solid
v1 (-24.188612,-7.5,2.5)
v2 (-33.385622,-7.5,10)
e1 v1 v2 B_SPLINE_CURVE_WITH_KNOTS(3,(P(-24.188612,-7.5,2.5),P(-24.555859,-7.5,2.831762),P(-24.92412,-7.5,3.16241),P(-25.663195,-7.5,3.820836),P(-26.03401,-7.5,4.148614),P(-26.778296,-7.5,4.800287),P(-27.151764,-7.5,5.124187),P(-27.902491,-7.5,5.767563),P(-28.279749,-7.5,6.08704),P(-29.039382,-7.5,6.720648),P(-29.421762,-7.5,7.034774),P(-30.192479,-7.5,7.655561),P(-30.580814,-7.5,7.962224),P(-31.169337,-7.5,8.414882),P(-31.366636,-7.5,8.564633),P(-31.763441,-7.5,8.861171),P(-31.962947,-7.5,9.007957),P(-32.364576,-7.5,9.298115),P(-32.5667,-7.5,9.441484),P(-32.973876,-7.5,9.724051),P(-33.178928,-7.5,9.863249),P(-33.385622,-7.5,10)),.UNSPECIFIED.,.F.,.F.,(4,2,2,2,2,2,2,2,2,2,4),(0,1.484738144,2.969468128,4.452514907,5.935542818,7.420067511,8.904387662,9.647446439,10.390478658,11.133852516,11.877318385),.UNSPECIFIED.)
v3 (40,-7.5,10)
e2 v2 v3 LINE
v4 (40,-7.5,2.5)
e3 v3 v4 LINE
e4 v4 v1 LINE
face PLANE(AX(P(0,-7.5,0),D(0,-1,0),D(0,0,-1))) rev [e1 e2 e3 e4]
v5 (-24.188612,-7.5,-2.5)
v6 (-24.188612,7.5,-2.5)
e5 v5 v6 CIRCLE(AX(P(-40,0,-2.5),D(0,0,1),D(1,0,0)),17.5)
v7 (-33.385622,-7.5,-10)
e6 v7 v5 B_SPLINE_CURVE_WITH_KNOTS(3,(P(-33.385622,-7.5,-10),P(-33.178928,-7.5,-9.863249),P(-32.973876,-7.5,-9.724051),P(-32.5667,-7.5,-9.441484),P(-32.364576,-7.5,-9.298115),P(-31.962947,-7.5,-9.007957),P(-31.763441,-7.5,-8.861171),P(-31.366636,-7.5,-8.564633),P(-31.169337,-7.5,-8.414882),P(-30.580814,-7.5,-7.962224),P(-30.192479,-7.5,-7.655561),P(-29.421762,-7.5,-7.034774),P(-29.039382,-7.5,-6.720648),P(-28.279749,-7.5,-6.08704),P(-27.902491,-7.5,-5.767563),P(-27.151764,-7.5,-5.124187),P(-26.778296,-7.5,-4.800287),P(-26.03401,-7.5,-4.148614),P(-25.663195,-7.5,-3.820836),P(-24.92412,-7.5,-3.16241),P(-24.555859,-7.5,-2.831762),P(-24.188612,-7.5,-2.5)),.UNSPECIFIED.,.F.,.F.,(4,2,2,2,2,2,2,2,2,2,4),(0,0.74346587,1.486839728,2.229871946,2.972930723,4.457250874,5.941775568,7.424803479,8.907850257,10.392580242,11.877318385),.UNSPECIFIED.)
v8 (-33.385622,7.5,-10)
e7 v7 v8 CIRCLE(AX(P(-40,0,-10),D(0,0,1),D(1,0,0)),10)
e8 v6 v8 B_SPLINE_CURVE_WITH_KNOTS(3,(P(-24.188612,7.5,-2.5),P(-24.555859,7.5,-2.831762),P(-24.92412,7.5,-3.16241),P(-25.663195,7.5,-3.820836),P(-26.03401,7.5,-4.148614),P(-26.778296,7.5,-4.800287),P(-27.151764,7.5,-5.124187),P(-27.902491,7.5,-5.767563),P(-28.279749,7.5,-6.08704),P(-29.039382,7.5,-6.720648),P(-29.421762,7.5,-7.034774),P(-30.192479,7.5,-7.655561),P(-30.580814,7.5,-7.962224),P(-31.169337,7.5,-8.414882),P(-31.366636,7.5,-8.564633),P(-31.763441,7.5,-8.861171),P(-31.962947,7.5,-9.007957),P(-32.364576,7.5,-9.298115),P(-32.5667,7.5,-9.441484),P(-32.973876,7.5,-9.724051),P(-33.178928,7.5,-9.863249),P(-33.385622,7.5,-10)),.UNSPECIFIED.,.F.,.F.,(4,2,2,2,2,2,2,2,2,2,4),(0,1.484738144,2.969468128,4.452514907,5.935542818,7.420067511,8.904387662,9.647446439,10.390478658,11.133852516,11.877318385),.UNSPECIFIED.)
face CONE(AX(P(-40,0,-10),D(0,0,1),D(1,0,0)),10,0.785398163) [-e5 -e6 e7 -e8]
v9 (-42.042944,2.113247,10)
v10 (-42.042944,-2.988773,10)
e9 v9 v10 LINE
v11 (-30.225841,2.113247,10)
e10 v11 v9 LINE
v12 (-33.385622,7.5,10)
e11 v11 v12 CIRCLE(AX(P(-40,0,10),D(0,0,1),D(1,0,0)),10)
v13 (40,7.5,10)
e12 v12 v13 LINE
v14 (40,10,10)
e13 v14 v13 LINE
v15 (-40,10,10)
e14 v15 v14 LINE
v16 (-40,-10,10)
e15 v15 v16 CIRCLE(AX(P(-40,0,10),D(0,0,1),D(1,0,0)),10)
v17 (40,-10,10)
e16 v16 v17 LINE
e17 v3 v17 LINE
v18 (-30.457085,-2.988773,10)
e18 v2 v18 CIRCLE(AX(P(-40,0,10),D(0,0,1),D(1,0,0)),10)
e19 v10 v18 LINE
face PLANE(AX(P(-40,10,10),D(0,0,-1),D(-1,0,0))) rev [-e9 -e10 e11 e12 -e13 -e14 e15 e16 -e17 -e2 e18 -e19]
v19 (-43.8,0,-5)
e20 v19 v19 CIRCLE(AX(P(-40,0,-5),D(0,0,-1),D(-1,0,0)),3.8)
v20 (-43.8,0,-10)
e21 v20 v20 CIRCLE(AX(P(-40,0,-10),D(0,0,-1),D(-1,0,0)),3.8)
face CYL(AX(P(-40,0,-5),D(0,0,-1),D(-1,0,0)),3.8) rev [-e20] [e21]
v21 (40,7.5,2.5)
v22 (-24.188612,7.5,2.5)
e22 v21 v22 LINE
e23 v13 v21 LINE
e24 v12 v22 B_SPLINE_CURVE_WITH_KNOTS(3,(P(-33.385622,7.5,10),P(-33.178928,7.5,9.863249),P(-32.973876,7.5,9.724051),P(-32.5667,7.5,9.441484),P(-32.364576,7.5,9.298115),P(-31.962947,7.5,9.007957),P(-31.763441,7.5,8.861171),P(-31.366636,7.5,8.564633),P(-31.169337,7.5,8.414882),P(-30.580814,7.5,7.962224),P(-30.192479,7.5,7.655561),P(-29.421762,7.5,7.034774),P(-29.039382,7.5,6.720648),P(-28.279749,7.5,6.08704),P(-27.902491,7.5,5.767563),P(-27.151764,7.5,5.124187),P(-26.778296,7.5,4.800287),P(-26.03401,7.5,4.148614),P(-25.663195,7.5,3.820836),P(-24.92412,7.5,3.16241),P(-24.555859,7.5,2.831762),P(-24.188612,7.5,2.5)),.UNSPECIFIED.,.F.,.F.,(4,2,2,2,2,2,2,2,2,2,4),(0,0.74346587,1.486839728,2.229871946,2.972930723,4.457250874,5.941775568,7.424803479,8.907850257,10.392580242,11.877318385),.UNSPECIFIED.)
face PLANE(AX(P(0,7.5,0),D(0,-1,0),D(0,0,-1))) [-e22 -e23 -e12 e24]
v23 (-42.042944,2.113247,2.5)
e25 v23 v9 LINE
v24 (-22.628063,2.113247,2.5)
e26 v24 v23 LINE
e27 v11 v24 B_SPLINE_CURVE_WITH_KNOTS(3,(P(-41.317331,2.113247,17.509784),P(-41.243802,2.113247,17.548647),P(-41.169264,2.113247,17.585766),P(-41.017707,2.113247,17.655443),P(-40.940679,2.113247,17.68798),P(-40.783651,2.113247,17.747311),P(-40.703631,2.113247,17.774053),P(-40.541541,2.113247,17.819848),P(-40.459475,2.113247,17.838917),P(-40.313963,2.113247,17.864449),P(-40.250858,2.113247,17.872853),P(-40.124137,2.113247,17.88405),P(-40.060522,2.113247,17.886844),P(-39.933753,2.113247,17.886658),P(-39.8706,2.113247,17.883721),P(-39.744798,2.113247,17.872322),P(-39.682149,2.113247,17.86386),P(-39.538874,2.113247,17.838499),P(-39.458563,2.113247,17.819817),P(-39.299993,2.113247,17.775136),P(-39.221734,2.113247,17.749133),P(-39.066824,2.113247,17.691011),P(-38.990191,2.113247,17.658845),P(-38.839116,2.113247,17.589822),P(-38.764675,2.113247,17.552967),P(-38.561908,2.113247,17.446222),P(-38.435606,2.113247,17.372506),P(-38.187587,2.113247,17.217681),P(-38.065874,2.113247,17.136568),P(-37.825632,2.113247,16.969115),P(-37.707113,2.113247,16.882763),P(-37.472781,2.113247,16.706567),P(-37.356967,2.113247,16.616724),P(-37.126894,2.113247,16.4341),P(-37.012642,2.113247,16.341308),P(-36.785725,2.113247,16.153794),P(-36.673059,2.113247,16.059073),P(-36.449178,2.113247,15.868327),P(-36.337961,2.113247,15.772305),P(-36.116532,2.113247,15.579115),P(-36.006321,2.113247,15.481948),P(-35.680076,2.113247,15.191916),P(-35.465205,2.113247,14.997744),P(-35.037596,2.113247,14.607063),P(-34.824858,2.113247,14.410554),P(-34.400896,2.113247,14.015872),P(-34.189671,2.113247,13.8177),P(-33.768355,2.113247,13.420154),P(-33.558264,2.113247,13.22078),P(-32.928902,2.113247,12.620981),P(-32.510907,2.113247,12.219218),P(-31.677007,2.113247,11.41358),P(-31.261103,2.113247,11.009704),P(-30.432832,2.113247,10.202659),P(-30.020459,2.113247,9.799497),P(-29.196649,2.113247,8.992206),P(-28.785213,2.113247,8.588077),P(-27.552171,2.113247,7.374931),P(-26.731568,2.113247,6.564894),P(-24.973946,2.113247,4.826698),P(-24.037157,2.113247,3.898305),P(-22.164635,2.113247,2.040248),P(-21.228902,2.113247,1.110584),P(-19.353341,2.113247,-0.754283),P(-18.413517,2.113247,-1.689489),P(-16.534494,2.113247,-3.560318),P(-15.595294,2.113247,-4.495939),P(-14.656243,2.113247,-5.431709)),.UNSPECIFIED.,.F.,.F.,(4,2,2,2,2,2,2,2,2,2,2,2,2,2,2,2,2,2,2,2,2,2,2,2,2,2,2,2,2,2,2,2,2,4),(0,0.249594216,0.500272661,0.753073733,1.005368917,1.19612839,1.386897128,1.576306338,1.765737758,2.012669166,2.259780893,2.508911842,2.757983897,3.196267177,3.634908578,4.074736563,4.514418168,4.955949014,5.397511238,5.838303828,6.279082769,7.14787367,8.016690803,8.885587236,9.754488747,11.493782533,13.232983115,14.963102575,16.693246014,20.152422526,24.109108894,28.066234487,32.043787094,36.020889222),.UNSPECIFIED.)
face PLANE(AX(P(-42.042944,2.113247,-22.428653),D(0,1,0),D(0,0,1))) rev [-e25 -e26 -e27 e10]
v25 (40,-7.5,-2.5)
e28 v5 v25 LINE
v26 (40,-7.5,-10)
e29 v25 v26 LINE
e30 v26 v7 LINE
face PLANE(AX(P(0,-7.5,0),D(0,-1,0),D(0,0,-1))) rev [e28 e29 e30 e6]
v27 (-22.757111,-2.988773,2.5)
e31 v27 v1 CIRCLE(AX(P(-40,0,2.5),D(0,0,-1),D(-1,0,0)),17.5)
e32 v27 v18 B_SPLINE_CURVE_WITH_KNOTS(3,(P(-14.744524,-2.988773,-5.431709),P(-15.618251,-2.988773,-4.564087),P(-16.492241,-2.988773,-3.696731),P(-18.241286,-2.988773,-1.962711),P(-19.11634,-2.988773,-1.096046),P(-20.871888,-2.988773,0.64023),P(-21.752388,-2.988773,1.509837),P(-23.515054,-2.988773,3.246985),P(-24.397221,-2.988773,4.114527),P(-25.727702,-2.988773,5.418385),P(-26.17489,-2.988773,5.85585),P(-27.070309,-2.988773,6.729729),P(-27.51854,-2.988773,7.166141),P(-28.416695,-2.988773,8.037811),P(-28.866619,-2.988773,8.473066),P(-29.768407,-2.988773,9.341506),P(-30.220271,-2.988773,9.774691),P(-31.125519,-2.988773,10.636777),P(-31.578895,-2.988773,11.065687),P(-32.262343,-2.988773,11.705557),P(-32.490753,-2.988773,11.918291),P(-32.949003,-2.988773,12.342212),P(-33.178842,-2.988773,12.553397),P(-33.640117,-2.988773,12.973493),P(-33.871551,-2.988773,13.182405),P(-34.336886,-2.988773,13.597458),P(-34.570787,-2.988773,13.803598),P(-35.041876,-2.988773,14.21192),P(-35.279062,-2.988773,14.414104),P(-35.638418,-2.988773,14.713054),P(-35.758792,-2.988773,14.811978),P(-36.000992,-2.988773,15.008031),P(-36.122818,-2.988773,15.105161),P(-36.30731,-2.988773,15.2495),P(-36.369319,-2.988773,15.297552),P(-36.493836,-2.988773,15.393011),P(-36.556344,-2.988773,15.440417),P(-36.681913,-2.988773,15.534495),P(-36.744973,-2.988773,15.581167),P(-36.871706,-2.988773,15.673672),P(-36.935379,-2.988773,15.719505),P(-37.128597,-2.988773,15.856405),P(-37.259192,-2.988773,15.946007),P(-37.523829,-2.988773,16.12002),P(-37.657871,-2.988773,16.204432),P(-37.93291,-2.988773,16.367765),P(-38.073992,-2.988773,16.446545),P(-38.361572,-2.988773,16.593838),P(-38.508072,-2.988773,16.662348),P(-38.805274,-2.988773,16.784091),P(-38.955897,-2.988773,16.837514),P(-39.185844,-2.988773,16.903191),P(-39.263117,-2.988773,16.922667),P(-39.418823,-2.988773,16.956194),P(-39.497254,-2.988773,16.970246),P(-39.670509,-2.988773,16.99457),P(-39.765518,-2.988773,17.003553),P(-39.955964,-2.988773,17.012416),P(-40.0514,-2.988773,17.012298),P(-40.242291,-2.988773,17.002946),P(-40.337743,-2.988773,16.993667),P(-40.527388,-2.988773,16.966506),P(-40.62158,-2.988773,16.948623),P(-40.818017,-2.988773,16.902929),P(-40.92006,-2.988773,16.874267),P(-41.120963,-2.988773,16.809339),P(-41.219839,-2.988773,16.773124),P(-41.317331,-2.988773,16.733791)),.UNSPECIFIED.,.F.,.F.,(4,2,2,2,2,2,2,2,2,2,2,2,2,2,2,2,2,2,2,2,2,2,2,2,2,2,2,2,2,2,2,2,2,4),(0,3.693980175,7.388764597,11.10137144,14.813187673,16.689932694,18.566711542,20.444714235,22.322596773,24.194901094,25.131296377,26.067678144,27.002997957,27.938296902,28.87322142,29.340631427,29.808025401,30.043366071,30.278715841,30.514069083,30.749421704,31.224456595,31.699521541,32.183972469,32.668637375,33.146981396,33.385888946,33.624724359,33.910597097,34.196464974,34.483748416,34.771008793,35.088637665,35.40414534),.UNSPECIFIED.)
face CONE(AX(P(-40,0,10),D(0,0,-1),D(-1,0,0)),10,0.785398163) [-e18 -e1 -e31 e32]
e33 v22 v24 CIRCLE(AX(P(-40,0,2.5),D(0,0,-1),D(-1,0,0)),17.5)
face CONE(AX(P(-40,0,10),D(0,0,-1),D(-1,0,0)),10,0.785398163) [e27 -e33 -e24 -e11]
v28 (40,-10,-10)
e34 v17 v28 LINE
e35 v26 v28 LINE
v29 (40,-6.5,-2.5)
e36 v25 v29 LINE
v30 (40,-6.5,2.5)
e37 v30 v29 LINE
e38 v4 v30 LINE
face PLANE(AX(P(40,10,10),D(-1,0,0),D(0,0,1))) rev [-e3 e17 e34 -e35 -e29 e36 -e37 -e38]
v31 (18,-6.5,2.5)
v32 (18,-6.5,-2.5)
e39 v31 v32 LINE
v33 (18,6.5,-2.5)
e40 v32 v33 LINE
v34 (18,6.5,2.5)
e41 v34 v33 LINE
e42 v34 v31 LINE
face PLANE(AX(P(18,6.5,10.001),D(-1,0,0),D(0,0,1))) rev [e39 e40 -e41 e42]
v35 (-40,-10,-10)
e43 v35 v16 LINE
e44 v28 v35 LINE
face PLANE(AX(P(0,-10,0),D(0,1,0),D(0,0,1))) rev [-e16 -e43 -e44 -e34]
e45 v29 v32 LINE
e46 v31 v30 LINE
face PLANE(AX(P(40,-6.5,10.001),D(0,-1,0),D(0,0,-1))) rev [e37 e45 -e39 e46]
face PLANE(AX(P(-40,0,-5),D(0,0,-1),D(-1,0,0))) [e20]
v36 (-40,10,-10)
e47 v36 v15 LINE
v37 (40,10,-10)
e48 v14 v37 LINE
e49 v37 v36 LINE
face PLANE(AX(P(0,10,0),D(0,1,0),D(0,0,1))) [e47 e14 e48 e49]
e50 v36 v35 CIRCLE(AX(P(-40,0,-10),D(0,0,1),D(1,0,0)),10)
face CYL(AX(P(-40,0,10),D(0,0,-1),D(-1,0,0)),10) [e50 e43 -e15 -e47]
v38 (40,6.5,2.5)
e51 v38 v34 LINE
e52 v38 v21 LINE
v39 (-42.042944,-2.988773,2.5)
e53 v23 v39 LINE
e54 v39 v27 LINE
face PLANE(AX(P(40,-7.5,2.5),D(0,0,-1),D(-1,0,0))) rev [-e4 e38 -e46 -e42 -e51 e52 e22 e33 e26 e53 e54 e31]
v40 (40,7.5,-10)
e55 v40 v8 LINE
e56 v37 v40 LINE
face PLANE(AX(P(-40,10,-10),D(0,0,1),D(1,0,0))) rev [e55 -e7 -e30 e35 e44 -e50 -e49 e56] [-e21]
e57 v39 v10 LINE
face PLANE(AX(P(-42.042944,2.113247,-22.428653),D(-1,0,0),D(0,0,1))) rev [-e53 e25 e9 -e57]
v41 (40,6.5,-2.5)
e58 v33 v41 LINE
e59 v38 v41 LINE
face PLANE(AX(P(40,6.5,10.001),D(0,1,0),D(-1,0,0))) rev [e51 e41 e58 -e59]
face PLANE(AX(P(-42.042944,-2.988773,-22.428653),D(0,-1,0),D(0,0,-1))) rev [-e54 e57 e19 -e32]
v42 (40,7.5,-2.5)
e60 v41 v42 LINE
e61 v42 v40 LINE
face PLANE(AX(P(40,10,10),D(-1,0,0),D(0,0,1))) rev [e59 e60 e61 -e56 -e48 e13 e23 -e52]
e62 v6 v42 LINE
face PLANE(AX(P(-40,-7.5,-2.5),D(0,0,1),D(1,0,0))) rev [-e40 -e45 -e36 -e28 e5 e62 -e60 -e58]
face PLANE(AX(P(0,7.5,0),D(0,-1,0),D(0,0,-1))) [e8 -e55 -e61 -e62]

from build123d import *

# Parameters (mm, degrees)
SKETCH1_W           = 80
SKETCH1_H           = 20
BOSS_EXTRUDE1_DEPTH = 10
SKETCH2_W           = 80
SKETCH2_H           = 7.5
CUT_EXTRUDE1_DEPTH  = 7.5
SKETCH3_R           = 10
BOSS_EXTRUDE2_DEPTH = 10
CHAMFER1_SIZE       = 7.5
SKETCH8_W           = 24.4009661
SKETCH8_H           = 5.102020184
CUT_EXTRUDE2_DEPTH  = 7.5
SKETCH9_R           = 3.8
CUT_EXTRUDE3_DEPTH  = 5
CUT_EXTRUDE4_REACH  = 54.5
SKETCH10_W          = 22
SKETCH10_H          = 13


with BuildPart() as part:
    # Sketch1 → Boss-Extrude1 (new, symmetric)
    with BuildSketch(Plane(origin=(0, 0, 0), x_dir=(1, 0, 0), z_dir=(0, 1, 0))):
        Rectangle(SKETCH1_W, SKETCH1_H)
    extrude(amount=BOSS_EXTRUDE1_DEPTH, both=True)

    # Sketch2 → Cut-Extrude1 (cut, symmetric)
    with BuildSketch(Plane(origin=(0, 0, 0), x_dir=(1, 0, 0), z_dir=(0, 1, 0))):
        with Locations((0, 6.25)):
            Rectangle(SKETCH2_W, SKETCH2_H)
        with Locations((0, -6.25)):
            Rectangle(SKETCH2_W, SKETCH2_H)
    extrude(amount=CUT_EXTRUDE1_DEPTH, both=True, mode=Mode.SUBTRACT)

    # Sketch3 → Boss-Extrude2 (add, symmetric)
    with BuildSketch(Plane.XY):
        with Locations((-40, 0)):
            Circle(SKETCH3_R)
    extrude(amount=BOSS_EXTRUDE2_DEPTH, both=True)

    # Chamfer1
    chamfer1_edges = [part.edges().sort_by_distance(p)[0] for p in [
        (-30, 0, -2.5),
        (-30, 0, 2.5),
    ]]
    chamfer(chamfer1_edges, length=CHAMFER1_SIZE - 0.0001)  # a hair under: the kernel refuses the full size

    # Sketch8 → Cut-Extrude2 (cut)
    with BuildSketch(Plane.XY.offset(10)):
        with Locations((-29.842461096, -0.437762938)):
            Rectangle(SKETCH8_W, SKETCH8_H)
    extrude(amount=-CUT_EXTRUDE2_DEPTH, mode=Mode.SUBTRACT)

    # Sketch9 → Cut-Extrude3 (cut)
    with BuildSketch(Plane(origin=(0, 0, -10), x_dir=(-1, 0, 0), z_dir=(0, 0, -1))):
        with Locations((40, 0)):
            Circle(SKETCH9_R)
    extrude(amount=-CUT_EXTRUDE3_DEPTH, mode=Mode.SUBTRACT)

    # Sketch10 → Cut-Extrude4 (cut, up to next)
    with BuildSketch(Plane(origin=(0, 0, -2.5), x_dir=(-1, 0, 0), z_dir=(0, 0, -1)), mode=Mode.PRIVATE) as cut_extrude4_sk1:
        with Locations((-29, 0)):
            Rectangle(SKETCH10_W, SKETCH10_H)
    cut_extrude4_tool1 = extrude(cut_extrude4_sk1.sketch, amount=-CUT_EXTRUDE4_REACH, mode=Mode.PRIVATE) & part.part
    add(cut_extrude4_tool1.solids().sort_by_distance((29, 0, -2.5))[0], mode=Mode.SUBTRACT)


solid = part.part
